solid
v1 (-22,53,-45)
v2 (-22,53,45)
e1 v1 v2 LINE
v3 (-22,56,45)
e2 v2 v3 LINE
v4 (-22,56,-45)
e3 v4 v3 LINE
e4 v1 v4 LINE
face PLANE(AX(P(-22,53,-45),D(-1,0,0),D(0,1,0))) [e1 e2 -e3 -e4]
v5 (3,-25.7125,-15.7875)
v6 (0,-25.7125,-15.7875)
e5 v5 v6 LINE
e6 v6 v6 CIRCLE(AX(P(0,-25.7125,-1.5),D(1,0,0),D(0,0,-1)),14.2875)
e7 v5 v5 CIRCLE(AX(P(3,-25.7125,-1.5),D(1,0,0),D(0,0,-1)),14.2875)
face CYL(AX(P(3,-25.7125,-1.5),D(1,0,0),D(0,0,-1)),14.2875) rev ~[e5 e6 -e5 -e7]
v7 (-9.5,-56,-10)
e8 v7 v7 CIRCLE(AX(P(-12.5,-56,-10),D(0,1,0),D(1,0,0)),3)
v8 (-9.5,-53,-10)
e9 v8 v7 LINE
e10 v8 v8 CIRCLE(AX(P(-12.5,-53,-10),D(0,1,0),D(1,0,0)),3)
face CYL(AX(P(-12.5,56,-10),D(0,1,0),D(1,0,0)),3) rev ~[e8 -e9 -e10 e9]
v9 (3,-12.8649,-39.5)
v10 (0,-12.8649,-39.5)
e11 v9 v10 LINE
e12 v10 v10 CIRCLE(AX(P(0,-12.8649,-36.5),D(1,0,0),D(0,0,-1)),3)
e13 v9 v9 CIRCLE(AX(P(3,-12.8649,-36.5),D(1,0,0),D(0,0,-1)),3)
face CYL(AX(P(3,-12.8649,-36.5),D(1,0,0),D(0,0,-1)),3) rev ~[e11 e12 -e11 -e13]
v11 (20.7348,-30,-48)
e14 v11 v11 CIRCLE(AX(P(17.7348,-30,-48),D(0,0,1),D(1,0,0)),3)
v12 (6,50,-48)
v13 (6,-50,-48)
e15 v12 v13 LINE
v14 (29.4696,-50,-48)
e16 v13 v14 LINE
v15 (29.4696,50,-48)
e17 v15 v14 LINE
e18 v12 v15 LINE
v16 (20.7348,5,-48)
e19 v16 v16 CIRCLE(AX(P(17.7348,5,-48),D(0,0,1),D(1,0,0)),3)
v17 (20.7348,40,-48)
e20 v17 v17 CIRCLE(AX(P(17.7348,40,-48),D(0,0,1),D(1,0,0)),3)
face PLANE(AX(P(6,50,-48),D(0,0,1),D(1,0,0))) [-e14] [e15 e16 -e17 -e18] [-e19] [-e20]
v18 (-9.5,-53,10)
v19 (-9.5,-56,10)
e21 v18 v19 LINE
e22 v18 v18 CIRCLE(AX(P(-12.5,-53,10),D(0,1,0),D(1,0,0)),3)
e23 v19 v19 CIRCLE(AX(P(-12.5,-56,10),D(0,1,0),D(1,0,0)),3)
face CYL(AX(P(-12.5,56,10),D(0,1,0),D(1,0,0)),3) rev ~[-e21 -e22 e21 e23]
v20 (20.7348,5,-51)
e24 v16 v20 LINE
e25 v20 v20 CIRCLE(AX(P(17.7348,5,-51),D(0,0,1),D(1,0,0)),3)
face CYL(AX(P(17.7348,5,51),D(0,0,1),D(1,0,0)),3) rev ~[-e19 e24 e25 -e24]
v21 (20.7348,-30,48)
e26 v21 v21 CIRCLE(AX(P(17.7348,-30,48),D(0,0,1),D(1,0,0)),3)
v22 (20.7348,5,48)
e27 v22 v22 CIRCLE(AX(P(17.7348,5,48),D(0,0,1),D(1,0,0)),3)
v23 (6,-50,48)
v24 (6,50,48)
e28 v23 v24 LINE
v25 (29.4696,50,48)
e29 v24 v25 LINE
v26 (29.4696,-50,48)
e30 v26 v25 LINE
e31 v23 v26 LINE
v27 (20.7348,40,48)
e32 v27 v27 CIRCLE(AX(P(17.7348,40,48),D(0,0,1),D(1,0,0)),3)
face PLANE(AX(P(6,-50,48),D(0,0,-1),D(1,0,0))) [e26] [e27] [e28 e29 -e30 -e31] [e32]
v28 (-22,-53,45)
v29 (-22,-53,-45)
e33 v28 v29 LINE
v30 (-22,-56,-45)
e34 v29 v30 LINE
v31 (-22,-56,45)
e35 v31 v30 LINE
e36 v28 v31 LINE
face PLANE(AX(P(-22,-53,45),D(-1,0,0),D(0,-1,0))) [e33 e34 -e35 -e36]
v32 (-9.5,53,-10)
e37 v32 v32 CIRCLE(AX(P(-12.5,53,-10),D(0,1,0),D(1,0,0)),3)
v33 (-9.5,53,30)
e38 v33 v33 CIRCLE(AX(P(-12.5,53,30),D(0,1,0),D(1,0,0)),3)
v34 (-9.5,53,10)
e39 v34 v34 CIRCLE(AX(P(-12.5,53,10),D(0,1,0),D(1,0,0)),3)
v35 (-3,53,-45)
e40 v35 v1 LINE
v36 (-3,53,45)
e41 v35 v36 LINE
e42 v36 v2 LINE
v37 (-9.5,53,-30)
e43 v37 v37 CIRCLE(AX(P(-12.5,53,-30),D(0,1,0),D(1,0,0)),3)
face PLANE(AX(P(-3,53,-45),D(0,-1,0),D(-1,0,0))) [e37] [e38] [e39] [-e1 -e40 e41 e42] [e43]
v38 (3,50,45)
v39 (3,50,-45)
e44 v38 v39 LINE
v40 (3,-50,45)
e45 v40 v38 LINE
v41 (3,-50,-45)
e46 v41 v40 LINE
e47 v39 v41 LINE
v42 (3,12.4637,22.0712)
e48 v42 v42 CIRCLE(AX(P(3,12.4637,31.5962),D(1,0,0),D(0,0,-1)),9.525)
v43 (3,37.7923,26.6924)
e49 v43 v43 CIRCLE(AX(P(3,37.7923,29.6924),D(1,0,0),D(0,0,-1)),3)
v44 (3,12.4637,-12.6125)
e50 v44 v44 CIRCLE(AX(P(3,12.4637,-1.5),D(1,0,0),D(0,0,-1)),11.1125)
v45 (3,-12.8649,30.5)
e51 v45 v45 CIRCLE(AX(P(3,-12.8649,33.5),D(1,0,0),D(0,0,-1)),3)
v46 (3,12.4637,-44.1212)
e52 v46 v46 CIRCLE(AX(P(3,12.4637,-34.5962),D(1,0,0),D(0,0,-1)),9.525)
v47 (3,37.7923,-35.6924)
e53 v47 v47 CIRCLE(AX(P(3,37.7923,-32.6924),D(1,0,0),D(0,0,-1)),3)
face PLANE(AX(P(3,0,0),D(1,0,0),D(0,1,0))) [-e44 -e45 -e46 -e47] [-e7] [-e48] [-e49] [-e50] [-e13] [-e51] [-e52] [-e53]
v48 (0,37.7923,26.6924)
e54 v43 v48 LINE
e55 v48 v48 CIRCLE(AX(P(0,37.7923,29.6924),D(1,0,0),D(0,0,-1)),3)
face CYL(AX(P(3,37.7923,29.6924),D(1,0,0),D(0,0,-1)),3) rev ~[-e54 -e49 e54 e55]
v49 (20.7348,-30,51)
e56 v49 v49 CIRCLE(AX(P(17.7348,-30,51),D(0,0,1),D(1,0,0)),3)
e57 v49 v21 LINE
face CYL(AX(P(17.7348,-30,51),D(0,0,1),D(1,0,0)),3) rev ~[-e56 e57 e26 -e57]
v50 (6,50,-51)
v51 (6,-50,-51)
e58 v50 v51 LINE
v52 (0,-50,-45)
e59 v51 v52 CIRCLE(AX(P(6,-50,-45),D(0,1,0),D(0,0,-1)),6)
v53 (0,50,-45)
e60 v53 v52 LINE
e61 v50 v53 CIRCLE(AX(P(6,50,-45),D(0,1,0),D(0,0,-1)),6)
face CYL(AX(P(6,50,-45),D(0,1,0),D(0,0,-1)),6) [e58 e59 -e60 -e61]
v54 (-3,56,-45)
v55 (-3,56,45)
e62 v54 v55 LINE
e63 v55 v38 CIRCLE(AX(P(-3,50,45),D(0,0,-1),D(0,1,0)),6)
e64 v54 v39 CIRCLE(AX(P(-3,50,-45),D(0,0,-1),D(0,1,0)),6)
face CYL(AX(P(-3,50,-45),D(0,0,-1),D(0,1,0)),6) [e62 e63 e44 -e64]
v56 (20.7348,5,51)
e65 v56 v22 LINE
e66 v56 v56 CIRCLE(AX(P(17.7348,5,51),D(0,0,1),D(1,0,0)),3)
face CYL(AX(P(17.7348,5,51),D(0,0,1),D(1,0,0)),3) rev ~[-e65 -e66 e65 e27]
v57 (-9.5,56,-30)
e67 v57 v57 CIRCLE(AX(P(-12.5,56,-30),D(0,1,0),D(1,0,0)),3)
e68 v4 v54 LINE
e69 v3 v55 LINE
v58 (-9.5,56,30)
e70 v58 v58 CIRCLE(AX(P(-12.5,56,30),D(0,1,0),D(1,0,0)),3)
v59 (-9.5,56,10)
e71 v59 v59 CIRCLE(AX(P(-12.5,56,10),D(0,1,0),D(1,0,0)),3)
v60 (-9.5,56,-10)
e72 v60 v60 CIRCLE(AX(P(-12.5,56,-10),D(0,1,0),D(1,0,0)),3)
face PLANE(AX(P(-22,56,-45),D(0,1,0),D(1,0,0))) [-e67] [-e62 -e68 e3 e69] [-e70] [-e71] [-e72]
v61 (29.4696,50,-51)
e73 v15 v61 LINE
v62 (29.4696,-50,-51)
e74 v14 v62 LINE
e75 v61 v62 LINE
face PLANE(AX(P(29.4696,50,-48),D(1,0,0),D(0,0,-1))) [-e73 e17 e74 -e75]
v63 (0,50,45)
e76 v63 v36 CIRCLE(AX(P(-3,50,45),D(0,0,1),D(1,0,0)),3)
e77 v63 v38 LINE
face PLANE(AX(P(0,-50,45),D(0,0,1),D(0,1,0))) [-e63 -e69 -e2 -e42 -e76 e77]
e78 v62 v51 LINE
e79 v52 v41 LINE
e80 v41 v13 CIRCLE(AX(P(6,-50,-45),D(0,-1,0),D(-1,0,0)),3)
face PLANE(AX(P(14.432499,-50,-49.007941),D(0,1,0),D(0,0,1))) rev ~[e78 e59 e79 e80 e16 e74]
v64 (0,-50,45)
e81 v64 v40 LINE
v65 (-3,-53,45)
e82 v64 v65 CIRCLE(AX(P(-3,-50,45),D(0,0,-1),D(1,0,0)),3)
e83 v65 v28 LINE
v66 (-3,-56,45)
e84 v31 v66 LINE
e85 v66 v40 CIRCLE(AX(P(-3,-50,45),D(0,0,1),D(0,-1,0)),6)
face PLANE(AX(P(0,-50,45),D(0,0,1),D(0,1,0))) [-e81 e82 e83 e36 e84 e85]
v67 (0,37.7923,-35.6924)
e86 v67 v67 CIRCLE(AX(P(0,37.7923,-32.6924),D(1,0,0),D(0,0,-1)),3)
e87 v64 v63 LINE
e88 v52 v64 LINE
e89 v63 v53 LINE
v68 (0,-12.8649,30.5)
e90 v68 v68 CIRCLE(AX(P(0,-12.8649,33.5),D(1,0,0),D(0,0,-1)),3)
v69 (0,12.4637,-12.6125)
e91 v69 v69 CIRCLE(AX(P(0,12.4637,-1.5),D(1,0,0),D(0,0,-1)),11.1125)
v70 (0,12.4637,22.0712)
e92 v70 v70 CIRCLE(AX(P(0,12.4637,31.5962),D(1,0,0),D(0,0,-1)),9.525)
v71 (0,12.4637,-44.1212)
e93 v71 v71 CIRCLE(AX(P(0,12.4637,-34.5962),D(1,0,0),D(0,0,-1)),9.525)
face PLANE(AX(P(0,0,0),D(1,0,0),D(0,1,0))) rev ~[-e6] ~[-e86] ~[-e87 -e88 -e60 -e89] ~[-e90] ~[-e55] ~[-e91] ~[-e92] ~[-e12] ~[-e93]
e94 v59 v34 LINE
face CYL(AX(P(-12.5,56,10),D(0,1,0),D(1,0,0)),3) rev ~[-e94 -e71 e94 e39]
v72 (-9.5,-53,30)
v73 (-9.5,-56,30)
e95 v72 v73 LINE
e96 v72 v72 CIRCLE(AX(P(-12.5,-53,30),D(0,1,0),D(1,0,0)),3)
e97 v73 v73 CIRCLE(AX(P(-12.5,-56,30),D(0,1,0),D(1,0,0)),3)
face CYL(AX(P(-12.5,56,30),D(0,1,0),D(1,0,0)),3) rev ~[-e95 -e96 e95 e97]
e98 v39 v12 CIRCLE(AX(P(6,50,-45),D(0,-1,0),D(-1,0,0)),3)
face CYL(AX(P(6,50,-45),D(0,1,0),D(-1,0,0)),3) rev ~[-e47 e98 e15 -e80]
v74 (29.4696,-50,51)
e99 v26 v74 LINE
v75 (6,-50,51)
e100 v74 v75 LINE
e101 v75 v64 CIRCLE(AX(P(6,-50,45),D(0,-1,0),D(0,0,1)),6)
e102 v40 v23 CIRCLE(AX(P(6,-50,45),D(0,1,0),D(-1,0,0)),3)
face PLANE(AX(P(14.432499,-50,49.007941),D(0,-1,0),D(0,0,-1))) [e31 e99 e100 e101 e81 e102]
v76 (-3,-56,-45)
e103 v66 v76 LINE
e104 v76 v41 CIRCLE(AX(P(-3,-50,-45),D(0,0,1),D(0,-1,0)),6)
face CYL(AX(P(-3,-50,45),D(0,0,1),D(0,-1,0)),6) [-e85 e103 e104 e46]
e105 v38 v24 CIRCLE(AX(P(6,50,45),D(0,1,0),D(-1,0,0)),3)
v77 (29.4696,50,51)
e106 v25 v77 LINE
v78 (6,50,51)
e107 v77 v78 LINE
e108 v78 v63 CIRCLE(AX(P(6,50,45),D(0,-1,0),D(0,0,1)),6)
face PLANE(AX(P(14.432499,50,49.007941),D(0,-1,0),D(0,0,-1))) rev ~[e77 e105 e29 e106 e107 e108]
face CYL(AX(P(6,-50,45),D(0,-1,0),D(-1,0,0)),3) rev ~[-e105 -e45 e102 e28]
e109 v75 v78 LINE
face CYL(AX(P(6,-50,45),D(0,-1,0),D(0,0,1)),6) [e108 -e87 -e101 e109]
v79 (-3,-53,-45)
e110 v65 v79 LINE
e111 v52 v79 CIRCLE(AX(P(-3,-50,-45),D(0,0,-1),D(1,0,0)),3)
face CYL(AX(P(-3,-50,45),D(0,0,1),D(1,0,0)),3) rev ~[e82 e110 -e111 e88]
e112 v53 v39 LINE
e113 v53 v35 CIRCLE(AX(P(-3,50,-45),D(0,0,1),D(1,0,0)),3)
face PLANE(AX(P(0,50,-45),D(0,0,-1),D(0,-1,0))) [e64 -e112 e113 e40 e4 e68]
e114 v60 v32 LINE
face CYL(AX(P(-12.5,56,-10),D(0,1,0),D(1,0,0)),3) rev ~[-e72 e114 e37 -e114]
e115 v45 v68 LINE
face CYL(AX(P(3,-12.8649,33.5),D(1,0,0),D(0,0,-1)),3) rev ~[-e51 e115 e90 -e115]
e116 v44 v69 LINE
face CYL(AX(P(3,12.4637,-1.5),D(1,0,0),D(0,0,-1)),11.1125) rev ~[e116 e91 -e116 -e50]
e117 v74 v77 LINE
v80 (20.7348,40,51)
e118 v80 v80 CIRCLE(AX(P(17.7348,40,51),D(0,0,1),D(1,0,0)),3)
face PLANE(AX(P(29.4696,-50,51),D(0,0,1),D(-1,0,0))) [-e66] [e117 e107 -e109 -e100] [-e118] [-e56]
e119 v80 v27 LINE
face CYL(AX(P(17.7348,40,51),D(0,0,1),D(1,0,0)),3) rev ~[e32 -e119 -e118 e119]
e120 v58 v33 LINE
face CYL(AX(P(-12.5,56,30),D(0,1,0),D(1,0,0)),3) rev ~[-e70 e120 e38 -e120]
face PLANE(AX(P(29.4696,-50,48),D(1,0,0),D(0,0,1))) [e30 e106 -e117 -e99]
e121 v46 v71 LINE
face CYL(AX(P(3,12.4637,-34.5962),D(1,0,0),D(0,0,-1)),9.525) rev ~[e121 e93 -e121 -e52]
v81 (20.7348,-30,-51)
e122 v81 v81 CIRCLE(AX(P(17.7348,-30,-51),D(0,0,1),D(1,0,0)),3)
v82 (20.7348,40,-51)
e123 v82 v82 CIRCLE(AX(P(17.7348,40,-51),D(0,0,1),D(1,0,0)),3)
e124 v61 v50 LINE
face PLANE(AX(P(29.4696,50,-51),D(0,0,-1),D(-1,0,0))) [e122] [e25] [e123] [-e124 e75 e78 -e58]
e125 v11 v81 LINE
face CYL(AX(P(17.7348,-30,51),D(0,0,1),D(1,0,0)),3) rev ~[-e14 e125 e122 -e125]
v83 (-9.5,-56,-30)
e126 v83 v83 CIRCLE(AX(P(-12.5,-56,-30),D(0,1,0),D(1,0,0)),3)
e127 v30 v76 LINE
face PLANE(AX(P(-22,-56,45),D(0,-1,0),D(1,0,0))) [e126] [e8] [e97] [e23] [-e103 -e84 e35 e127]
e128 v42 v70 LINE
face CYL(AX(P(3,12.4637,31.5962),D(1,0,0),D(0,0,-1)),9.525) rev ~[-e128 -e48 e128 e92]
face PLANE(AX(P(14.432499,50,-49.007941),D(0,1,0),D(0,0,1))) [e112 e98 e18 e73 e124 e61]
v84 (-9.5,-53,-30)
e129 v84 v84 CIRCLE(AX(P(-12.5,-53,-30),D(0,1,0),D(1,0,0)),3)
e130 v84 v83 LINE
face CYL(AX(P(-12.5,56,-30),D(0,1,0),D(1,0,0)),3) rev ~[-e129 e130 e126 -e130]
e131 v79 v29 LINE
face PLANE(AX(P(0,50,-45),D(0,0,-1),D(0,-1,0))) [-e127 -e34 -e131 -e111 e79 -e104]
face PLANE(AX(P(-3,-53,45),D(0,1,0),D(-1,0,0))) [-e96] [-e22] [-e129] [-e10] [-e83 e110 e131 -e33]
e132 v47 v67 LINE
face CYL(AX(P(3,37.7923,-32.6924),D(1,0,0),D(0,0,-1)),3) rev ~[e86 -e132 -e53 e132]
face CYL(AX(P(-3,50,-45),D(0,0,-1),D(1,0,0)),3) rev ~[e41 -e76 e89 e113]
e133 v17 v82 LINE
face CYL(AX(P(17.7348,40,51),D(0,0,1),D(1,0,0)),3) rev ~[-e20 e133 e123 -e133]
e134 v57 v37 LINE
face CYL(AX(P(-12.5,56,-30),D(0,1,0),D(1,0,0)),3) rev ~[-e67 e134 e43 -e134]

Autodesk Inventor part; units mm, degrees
ref_plane "YZ Plane" through (0, 0, 0) normal (1, 0, 0) x (0, 1, 0)
ref_plane "XZ Plane" through (0, 0, 0) normal (0, 1, 0) x (-1, 0, 0)
ref_plane "XY Plane" through (0, 0, 0) normal (0, 0, 1) x (1, 0, 0)
sketch "Sketch1" plane through (0, 0, 0) normal (1, 0, 0) x (0, 1, 0)
  line L0 (-50, 45) -> (50, 45)
  line L1 (50, 45) -> (50, -45)
  line L2 (50, -45) -> (-50, -45)
  line L3 (-50, -45) -> (-50, 45)
  point P0 (0, 0)
  dimension "d0" = 100
  dimension "d35" = 90
  dimension "d36" = 50
  dimension "d37" = 45
extrude "Plate1" add sketch "Sketch1" along normal blind 3
sketch "Sketch2" plane through (-3, 53, -45) normal (0, 1, 0) x (-1, 0, 0)
  line L0 (0, 90) -> (0, 0)
  line L1 (0, 0) -> (19, 0)
  line L2 (19, 0) -> (19, 90)
  line L3 (19, 90) -> (0, 90)
edge flange "Flange1" height 25 angle 90 thickness 3 bend radius 3 thickness toward (0, 1, 0) relief tear relief width 3 relief depth 1.5 corner gap 3 corner form 0 edges at (0, 50, 0) (0, -50, 0) wall of the first edge with corners at (-3, 53, 45) (-3, 53, -45) (-22, 53, -45) (-22, 53, 45)
bend "Bend1"
corner "Corner1"
sketch "Sketch3" plane through (6, -50, 48) normal (0, 0, 1) x (1, 0, 0)
  line L0 (0, 100) -> (0, 0)
  line L1 (0, 0) -> (23.4696, 0)
  line L2 (23.4696, 0) -> (23.4696, 100)
  line L3 (23.4696, 100) -> (0, 100)
edge flange "Flange2" height 29.4696 angle 90 thickness 3 bend radius 3 thickness toward (0, 0, 1) relief tear relief width 3 relief depth 1.5 corner gap 3 corner form 0 edges at (3, 0, 45) (3, 0, -45) wall of the first edge with corners at (6, 50, 48) (6, -50, 48) (29.4696, -50, 48) (29.4696, 50, 48)
bend "Bend2"
corner "Corner2"
sketch "Sketch4" plane through (3, 0, 0) normal (1, 0, 0) x (0, 0, -1)
  line L0 (-45, 50) -> (45, 50) projected
  line L1 (-45, -50) -> (-45, 50) projected
  line L2 (45, -50) -> (-45, -50) projected
  line L3 (45, 50) -> (45, -50) projected
  circle A0 centre (-31.5962, 12.4637) radius 7.62 construction
  circle A1 centre (1.5, 12.4637) radius 12.7 construction
  circle A2 centre (34.5962, 12.4637) radius 7.62 construction
  circle A3 centre (1.5, -25.7125) radius 25.4 construction
  circle A4 centre (1.5, 12.4637) radius 25.4 construction
  line L4 (26.9762, 12.4637) -> (26.9, 12.4637) construction
  line L5 (-23.9762, 12.4637) -> (-23.9, 12.4637) construction
  line L6 (1.5, -0.3125) -> (1.5, -0.2363) construction
  line L7 (-33.5, -12.8649) -> (-29.6924, 37.7923) construction
  line L8 (36.5, -12.8649) -> (32.6924, 37.7923) construction
  point P0 (0, 0)
  dimension "d24" = 25.4
  dimension "d25" = 15.24
  dimension "d27" = 50.8
  dimension "d23" = 0.0762
  dimension "d26" = 50.8
  dimension "d34" = 66.1924
  dimension "d38" = 24.2875
  dimension "d40" = 46.5
  dimension "d41" = 43.5
  dimension "d42" = 50.8
  dimension "d45" = 70
sketch "Sketch5" plane through (3, 0, 0) normal (1, 0, 0) x (0, 0, -1)
  circle A0 centre (-31.5962, 12.4637) radius 9.525
  circle A1 centre (34.5962, 12.4637) radius 9.525
  circle A2 centre (1.5, 12.4637) radius 11.1125
  circle A3 centre (1.5, -25.7125) radius 14.2875
  line L0 (-33.5, -12.8649) -> (-29.6924, 37.7923) construction
  line L1 (36.5, -12.8649) -> (32.6924, 37.7923) construction
  circle A4 centre (-29.6924, 37.7923) radius 3
  circle A5 centre (32.6924, 37.7923) radius 3
  circle A6 centre (36.5, -12.8649) radius 3
  circle A7 centre (-33.5, -12.8649) radius 3
  point P0 (0, 0)
  dimension "d28" = 19.05
  dimension "d30" = 22.225
  dimension "d31" = 28.575
  dimension "d44" = 6
extrude "Cut1" cut sketch "Sketch5" against normal blind 3
sketch "Sketch7" plane through (29.4696, -50, 51) normal (0, 0, 1) x (1, 0, 0)
  line L0 (-23.4696, 100) -> (-23.4696, 0) projected
  line L1 (0, 100) -> (0, 0) projected
  line L2 (-23.4696, 100) -> (0, 100) projected
  circle A0 centre (-11.7348, 90) radius 3
  circle A1 centre (-11.7348, 55) radius 3
  circle A2 centre (-11.7348, 20) radius 3
  point P0 (-29.4696, 50)
  dimension "d72" = 6
  dimension "d74" = 11.7348
  dimension "d75" = 11.7348
  dimension "d76" = 10
  dimension "d79" = 35
extrude "Cut3" cut sketch "Sketch7" against normal through all
sketch "Sketch8" plane through (-22, 56, 45) normal (0, 1, 0) x (1, 0, 0)
  line L0 (19, 0) -> (19, 90) projected
  line L1 (0, 0) -> (0, 90) projected
  line L2 (19, 0) -> (0, 0) projected
  circle A0 centre (9.5, 15) radius 3
  circle A1 centre (9.5, 35) radius 3
  circle A2 centre (9.5, 55) radius 3
  circle A3 centre (9.5, 75) radius 3
  point P0 (22, 45)
  dimension "d86" = 6
  dimension "d88" = 9.5
  dimension "d89" = 9.5
  dimension "d90" = 15
  dimension "d93" = 20
extrude "Cut4" cut sketch "Sketch8" against normal through all
sketch "Sketch9" plane through (0, 0, 0) normal (-1, 0, 0) x (0, 0, 1)
  circle A0 centre (-1.5, 12.4637) radius 11.1125 projected
  circle A1 centre (-32.6924, 37.7923) radius 3 projected
  circle A2 centre (-34.5962, 12.4637) radius 9.525 projected
  line L0 (45, 50) -> (-45, 50) projected
  arc A3 (-20.715, 19.4163) -> (-27.9683, 26.5028) centre (-34.5962, 12.4637) ccw
  arc A4 (-28.1286, 30.0352) -> (-24.3769, 41.235) centre (-32.6924, 37.7923) ccw
  arc A5 (-5.9768, 28.9802) -> (-17.1032, 19.4907) centre (-1.5, 12.4637) ccw
  line L1 (-6.5, 44) -> (-22.529, 44)
  arc A6 (-28.1286, 30.0352) -> (-27.9683, 26.5028) centre (-27.1145, 28.3114) ccw
  arc A7 (-22.529, 44) -> (-24.3769, 41.235) centre (-22.529, 42) ccw
  arc A8 (-20.715, 19.4163) -> (-17.1032, 19.4907) centre (-18.9268, 20.3119) ccw
  circle A9 centre (-36.5, -12.8649) radius 3 projected
  circle A10 centre (-1.5, -25.7125) radius 14.2875 projected
  line L2 (-45, 50) -> (-45, -50) projected
  line L3 (-45, -50) -> (45, -50) projected
  line L4 (-4.5, 30.9106) -> (-4.5, 42)
  arc A11 (-4.5, 42) -> (-6.5, 44) centre (-6.5, 42) ccw
  arc A12 (-5.9768, 28.9802) -> (-4.5, 30.9106) centre (-6.5, 30.9106) ccw
  line L5 (-1.5, 12.4637) -> (-1.5, -25.7125)
  arc A13 (-21.6278, -23.1723) -> (-15.3483, -40.5384) centre (-1.5, -25.7125) ccw
  arc A14 (-36.9091, -21.8555) -> (-30.3842, -19.4676) centre (-36.5, -12.8649) ccw
  line L6 (-39, -23.8535) -> (-39, -42)
  line L7 (-16.7135, -44) -> (-37, -44)
  arc A15 (-39, -42) -> (-37, -44) centre (-37, -42) ccw
  arc A16 (-16.7135, -44) -> (-15.3483, -40.5384) centre (-16.7135, -42) ccw
  arc A17 (-36.9091, -21.8555) -> (-39, -23.8535) centre (-37, -23.8535) ccw
  line L8 (-28.3359, -19.0574) -> (-22.9229, -21.0444)
  arc A18 (-28.3359, -19.0574) -> (-30.3842, -19.4676) centre (-29.0251, -20.9349) ccw
  arc A19 (-21.6278, -23.1723) -> (-22.9229, -21.0444) centre (-23.6121, -22.9219) ccw
  arc A20 (-27.5648, -11.7869) -> (-30.828, -5.8772) centre (-36.5, -12.8649) ccw
  arc A21 (-8.7645, -6.7702) -> (-18.4911, -14.6272) centre (-1.5, -25.7125) ccw
  arc A22 (-17.1032, 5.4367) -> (-8.6455, -3.0855) centre (-1.5, 12.4637) ccw
  arc A23 (-30.1414, -2.4084) -> (-20.715, 5.5111) centre (-34.5962, 12.4637) ccw
  line L9 (-26.2684, -13.4249) -> (-20.8554, -15.4119)
  arc A24 (-27.5648, -11.7869) -> (-26.2684, -13.4249) centre (-25.5792, -11.5474) ccw
  arc A25 (-30.1414, -2.4084) -> (-30.828, -5.8772) centre (-29.5675, -4.3243) ccw
  arc A26 (-17.1032, 5.4367) -> (-20.715, 5.5111) centre (-18.9268, 4.6155) ccw
  arc A27 (-8.7645, -6.7702) -> (-8.6455, -3.0855) centre (-9.4807, -4.9028) ccw
  arc A28 (-20.8554, -15.4119) -> (-18.4911, -14.6272) centre (-20.1662, -13.5344) ccw
  arc A29 (24.9683, 26.5028) -> (17.715, 19.4163) centre (31.5962, 12.4637) ccw
  arc A30 (21.3769, 41.235) -> (25.1286, 30.0352) centre (29.6924, 37.7923) ccw
  arc A31 (14.1032, 19.4907) -> (2.9768, 28.9802) centre (-1.5, 12.4637) ccw
  line L10 (3.5, 44) -> (19.529, 44)
  arc A32 (24.9683, 26.5028) -> (25.1286, 30.0352) centre (24.1145, 28.3114) ccw
  arc A33 (21.3769, 41.235) -> (19.529, 44) centre (19.529, 42) ccw
  arc A34 (14.1032, 19.4907) -> (17.715, 19.4163) centre (15.9268, 20.3119) ccw
  line L11 (1.5, 30.9106) -> (1.5, 42)
  arc A35 (3.5, 44) -> (1.5, 42) centre (3.5, 42) ccw
  arc A36 (1.5, 30.9106) -> (2.9768, 28.9802) centre (3.5, 30.9106) ccw
  arc A37 (12.3483, -40.5384) -> (18.6278, -23.1723) centre (-1.5, -25.7125) ccw
  arc A38 (27.3842, -19.4676) -> (33.9091, -21.8555) centre (33.5, -12.8649) ccw
  line L12 (36, -23.8535) -> (36, -42)
  line L13 (13.7135, -44) -> (34, -44)
  arc A39 (34, -44) -> (36, -42) centre (34, -42) ccw
  arc A40 (12.3483, -40.5384) -> (13.7135, -44) centre (13.7135, -42) ccw
  arc A41 (36, -23.8535) -> (33.9091, -21.8555) centre (34, -23.8535) ccw
  line L14 (25.3359, -19.0574) -> (19.9229, -21.0444)
  arc A42 (27.3842, -19.4676) -> (25.3359, -19.0574) centre (26.0251, -20.9349) ccw
  arc A43 (19.9229, -21.0444) -> (18.6278, -23.1723) centre (20.6121, -22.9219) ccw
  arc A44 (27.828, -5.8772) -> (24.5648, -11.7869) centre (33.5, -12.8649) ccw
  arc A45 (15.4911, -14.6272) -> (5.7645, -6.7702) centre (-1.5, -25.7125) ccw
  arc A46 (5.6455, -3.0855) -> (14.1032, 5.4367) centre (-1.5, 12.4637) ccw
  arc A47 (17.715, 5.5111) -> (27.1414, -2.4084) centre (31.5962, 12.4637) ccw
  line L15 (23.2684, -13.4249) -> (17.8554, -15.4119)
  arc A48 (23.2684, -13.4249) -> (24.5648, -11.7869) centre (22.5792, -11.5474) ccw
  arc A49 (27.828, -5.8772) -> (27.1414, -2.4084) centre (26.5675, -4.3243) ccw
  arc A50 (17.715, 5.5111) -> (14.1032, 5.4367) centre (15.9268, 4.6155) ccw
  arc A51 (5.6455, -3.0855) -> (5.7645, -6.7702) centre (6.4807, -4.9028) ccw
  arc A52 (15.4911, -14.6272) -> (17.8554, -15.4119) centre (17.1662, -13.5344) ccw
  point P0 (0, 0)
  point P1 (-26.176, 44)
  dimension "d100" = 6
  dimension "d101" = 6
  dimension "d102" = 6
  dimension "d103" = 6
  dimension "d105" = 2
  dimension "d108" = 6
  dimension "d109" = 6
  dimension "d110" = 3
  dimension "d111" = 6
  dimension "d112" = 6
  dimension "d113" = 3
  dimension "d114" = 6
cut "Cut5" [suppressed]
equation "\"d32\" = Thickness"
equation "\"d3\" = BendReliefWidth"
equation "\"d4\" = BendReliefDepth"
equation "\"d5\" = MinimumRemnant"
equation "\"d6\" = BendRadius"
equation "\"d9\" = BendRadius"
equation "\"d10\" = CornerReliefSize"
equation "\"d11\" = GapSize"
equation "\"d12\" = JacobiRadiusSize"
equation "\"d13\" = BendReliefWidth"
equation "\"d14\" = BendReliefDepth"
equation "\"d15\" = MinimumRemnant"
equation "\"d16\" = BendRadius"
equation "\"d19\" = BendRadius"
equation "\"d20\" = CornerReliefSize"
equation "\"d21\" = GapSize"
equation "\"d22\" = JacobiRadiusSize"
equation "\"d36\" = 0.5 * d0"
equation "\"d37\" = 0.5 * d35"
equation "\"BendRadius\" = Thickness"
equation "\"BendReliefWidth\" = Thickness"
equation "\"BendReliefDepth\" = 0.5 * Thickness"
equation "\"CornerReliefSize\" = 4 * Thickness"
equation "\"MinimumRemnant\" = 2 * Thickness"
equation "\"TransitionRadius\" = BendRadius"
equation "\"JacobiRadiusSize\" = BendRadius"
equation "\"GapSize\" = Thickness"
equation "\"d2\" = BendRadius"
equation "\"Thickness\" = 3"
properties part number "GearboxPlate" material "Aluminum 6061"
